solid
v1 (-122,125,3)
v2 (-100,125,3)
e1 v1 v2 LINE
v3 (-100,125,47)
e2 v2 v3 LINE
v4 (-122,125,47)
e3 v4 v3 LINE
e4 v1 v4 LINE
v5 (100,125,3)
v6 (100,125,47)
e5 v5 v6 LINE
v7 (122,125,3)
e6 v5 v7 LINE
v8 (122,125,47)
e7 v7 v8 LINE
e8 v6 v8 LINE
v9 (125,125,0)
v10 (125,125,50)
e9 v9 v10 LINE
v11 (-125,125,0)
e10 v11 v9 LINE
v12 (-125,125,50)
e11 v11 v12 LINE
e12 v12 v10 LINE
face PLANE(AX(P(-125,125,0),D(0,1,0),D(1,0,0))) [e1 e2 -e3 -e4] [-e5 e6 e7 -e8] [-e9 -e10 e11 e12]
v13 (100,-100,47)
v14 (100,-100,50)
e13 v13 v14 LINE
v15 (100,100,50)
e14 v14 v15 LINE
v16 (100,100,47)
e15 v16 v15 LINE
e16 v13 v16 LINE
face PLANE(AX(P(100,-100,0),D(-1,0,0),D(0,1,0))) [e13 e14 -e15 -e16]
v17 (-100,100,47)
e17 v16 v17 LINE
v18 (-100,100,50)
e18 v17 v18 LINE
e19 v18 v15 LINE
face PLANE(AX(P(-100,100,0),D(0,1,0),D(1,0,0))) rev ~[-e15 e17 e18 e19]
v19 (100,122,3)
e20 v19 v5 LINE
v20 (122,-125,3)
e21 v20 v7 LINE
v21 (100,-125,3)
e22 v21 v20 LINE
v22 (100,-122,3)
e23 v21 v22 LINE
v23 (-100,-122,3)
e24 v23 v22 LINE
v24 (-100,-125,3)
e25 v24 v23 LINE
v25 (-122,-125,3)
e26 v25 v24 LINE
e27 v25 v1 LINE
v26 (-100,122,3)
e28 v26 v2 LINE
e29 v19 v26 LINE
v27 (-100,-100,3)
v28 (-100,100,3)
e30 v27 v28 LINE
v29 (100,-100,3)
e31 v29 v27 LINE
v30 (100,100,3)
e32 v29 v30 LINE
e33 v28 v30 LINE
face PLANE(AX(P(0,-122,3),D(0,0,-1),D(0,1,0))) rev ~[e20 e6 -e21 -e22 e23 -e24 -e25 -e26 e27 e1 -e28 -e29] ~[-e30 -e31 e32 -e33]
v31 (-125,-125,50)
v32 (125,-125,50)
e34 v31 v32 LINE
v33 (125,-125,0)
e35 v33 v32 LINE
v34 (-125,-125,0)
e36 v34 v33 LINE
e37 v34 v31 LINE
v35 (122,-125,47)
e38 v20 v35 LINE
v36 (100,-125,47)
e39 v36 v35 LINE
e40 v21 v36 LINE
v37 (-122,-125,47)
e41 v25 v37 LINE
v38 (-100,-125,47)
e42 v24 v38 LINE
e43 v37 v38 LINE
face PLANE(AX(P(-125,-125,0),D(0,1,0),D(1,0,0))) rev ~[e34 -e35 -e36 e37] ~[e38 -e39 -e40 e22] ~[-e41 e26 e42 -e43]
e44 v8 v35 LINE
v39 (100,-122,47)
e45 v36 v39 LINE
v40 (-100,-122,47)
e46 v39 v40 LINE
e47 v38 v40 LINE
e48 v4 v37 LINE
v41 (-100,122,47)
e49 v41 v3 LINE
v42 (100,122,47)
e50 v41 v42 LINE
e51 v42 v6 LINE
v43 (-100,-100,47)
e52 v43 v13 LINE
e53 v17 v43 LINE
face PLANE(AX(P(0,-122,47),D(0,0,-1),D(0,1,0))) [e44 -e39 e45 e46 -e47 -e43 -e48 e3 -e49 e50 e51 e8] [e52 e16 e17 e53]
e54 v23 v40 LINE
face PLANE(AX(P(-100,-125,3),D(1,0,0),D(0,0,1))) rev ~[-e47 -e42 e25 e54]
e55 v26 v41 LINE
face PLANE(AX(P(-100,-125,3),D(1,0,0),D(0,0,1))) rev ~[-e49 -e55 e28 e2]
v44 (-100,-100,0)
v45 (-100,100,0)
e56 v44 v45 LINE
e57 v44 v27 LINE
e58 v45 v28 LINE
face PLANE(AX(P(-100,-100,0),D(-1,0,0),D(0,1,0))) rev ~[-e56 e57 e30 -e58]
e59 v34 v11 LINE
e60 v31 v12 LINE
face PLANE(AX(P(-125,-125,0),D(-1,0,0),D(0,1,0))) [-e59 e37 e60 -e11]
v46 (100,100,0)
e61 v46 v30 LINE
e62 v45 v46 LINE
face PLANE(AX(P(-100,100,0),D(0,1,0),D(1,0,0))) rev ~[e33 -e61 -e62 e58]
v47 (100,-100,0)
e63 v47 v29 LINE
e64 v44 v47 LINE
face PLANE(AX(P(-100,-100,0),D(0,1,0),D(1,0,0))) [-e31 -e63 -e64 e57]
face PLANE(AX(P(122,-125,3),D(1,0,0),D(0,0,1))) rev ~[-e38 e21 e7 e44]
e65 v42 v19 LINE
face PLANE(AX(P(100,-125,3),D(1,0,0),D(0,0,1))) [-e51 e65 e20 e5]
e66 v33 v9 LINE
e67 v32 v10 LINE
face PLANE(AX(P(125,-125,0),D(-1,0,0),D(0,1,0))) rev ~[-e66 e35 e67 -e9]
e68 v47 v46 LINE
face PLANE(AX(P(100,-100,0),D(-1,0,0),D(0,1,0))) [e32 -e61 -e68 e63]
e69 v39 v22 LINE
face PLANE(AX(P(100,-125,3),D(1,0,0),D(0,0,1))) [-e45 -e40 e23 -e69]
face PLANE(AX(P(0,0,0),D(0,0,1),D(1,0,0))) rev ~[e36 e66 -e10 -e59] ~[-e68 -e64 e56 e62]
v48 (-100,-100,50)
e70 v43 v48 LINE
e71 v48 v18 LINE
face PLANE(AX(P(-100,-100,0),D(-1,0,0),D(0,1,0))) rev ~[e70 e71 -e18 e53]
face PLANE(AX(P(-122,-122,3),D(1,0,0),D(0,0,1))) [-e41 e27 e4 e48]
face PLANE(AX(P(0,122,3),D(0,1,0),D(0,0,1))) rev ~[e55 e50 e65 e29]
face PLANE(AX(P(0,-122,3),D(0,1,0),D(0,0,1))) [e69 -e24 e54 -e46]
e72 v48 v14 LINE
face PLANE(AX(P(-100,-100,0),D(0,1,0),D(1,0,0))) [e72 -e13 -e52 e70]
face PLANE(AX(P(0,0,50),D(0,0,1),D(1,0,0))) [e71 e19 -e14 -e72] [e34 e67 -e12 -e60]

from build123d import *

# Parameters (mm, degrees)
F0_W      = 250
F0_H      = 250
F0_W_2    = 200
F0_H_2    = 200
F1_DEPTH  = 50
F2_W      = 22
F2_H      = 44
F3_DEPTH  = 250
F6_W      = 25
F6_H      = 44
F7_DEPTH  = 125
F8_DEPTH  = 25
F9_DEPTH  = 25
F12_DEPTH = 122
F13_DEPTH = 122


# Not quite as in the source:
# - an extrude ends at something that could not be found from the text; its depth is read off the source's solid
# - a feature of the source that left no trace in its solid (it failed there, or was rolled back) is left out


with BuildPart() as f1:
    # F0 (on Top) → F1 (new body)
    with BuildSketch(Plane.XY):
        Rectangle(F0_W, F0_H)
        Rectangle(F0_W_2, F0_H_2, mode=Mode.SUBTRACT)
    extrude(amount=F1_DEPTH)

    # F2 (on face) → F3 (cut, through all)
    with BuildSketch(Plane.XZ.offset(125)):
        with Locations((-111, 25)):
            Rectangle(F2_W, F2_H)
        with Locations((111, 25)):
            Rectangle(F2_W, F2_H)
    extrude(amount=-F3_DEPTH, mode=Mode.SUBTRACT)

    # F6 (on Right) → F7 (cut, through all)
    with BuildSketch(Plane.YZ):
        with Locations((109.5, 25)):
            Rectangle(F6_W, F6_H)
        with Locations((-109.5, 25)):
            Rectangle(F6_W, F6_H)
    extrude(amount=-F7_DEPTH, mode=Mode.SUBTRACT)

    # F8 (add): a face of the model
    f8_faces = [f1.faces().sort_by_distance(p)[0] for p in [
        (-123.5, 97, 25),
    ]]
    extrude(f8_faces, amount=F8_DEPTH)

    # F9 (add): a face of the model
    f9_faces = [f1.faces().sort_by_distance(p)[0] for p in [
        (-123.5, -122, 25),
    ]]
    extrude(f9_faces, amount=F9_DEPTH)

    # F12 (cut, through all): a face of the model
    f12_faces = [f1.faces().sort_by_distance(p)[0] for p in [
        (0, -111, 25),
    ]]
    extrude(f12_faces, amount=-F12_DEPTH, mode=Mode.SUBTRACT)

    # F13 (cut, through all): a face of the model
    f13_faces = [f1.faces().sort_by_distance(p)[0] for p in [
        (0, 111, 25),
    ]]
    extrude(f13_faces, amount=-F13_DEPTH, mode=Mode.SUBTRACT)


solid = f1.part
